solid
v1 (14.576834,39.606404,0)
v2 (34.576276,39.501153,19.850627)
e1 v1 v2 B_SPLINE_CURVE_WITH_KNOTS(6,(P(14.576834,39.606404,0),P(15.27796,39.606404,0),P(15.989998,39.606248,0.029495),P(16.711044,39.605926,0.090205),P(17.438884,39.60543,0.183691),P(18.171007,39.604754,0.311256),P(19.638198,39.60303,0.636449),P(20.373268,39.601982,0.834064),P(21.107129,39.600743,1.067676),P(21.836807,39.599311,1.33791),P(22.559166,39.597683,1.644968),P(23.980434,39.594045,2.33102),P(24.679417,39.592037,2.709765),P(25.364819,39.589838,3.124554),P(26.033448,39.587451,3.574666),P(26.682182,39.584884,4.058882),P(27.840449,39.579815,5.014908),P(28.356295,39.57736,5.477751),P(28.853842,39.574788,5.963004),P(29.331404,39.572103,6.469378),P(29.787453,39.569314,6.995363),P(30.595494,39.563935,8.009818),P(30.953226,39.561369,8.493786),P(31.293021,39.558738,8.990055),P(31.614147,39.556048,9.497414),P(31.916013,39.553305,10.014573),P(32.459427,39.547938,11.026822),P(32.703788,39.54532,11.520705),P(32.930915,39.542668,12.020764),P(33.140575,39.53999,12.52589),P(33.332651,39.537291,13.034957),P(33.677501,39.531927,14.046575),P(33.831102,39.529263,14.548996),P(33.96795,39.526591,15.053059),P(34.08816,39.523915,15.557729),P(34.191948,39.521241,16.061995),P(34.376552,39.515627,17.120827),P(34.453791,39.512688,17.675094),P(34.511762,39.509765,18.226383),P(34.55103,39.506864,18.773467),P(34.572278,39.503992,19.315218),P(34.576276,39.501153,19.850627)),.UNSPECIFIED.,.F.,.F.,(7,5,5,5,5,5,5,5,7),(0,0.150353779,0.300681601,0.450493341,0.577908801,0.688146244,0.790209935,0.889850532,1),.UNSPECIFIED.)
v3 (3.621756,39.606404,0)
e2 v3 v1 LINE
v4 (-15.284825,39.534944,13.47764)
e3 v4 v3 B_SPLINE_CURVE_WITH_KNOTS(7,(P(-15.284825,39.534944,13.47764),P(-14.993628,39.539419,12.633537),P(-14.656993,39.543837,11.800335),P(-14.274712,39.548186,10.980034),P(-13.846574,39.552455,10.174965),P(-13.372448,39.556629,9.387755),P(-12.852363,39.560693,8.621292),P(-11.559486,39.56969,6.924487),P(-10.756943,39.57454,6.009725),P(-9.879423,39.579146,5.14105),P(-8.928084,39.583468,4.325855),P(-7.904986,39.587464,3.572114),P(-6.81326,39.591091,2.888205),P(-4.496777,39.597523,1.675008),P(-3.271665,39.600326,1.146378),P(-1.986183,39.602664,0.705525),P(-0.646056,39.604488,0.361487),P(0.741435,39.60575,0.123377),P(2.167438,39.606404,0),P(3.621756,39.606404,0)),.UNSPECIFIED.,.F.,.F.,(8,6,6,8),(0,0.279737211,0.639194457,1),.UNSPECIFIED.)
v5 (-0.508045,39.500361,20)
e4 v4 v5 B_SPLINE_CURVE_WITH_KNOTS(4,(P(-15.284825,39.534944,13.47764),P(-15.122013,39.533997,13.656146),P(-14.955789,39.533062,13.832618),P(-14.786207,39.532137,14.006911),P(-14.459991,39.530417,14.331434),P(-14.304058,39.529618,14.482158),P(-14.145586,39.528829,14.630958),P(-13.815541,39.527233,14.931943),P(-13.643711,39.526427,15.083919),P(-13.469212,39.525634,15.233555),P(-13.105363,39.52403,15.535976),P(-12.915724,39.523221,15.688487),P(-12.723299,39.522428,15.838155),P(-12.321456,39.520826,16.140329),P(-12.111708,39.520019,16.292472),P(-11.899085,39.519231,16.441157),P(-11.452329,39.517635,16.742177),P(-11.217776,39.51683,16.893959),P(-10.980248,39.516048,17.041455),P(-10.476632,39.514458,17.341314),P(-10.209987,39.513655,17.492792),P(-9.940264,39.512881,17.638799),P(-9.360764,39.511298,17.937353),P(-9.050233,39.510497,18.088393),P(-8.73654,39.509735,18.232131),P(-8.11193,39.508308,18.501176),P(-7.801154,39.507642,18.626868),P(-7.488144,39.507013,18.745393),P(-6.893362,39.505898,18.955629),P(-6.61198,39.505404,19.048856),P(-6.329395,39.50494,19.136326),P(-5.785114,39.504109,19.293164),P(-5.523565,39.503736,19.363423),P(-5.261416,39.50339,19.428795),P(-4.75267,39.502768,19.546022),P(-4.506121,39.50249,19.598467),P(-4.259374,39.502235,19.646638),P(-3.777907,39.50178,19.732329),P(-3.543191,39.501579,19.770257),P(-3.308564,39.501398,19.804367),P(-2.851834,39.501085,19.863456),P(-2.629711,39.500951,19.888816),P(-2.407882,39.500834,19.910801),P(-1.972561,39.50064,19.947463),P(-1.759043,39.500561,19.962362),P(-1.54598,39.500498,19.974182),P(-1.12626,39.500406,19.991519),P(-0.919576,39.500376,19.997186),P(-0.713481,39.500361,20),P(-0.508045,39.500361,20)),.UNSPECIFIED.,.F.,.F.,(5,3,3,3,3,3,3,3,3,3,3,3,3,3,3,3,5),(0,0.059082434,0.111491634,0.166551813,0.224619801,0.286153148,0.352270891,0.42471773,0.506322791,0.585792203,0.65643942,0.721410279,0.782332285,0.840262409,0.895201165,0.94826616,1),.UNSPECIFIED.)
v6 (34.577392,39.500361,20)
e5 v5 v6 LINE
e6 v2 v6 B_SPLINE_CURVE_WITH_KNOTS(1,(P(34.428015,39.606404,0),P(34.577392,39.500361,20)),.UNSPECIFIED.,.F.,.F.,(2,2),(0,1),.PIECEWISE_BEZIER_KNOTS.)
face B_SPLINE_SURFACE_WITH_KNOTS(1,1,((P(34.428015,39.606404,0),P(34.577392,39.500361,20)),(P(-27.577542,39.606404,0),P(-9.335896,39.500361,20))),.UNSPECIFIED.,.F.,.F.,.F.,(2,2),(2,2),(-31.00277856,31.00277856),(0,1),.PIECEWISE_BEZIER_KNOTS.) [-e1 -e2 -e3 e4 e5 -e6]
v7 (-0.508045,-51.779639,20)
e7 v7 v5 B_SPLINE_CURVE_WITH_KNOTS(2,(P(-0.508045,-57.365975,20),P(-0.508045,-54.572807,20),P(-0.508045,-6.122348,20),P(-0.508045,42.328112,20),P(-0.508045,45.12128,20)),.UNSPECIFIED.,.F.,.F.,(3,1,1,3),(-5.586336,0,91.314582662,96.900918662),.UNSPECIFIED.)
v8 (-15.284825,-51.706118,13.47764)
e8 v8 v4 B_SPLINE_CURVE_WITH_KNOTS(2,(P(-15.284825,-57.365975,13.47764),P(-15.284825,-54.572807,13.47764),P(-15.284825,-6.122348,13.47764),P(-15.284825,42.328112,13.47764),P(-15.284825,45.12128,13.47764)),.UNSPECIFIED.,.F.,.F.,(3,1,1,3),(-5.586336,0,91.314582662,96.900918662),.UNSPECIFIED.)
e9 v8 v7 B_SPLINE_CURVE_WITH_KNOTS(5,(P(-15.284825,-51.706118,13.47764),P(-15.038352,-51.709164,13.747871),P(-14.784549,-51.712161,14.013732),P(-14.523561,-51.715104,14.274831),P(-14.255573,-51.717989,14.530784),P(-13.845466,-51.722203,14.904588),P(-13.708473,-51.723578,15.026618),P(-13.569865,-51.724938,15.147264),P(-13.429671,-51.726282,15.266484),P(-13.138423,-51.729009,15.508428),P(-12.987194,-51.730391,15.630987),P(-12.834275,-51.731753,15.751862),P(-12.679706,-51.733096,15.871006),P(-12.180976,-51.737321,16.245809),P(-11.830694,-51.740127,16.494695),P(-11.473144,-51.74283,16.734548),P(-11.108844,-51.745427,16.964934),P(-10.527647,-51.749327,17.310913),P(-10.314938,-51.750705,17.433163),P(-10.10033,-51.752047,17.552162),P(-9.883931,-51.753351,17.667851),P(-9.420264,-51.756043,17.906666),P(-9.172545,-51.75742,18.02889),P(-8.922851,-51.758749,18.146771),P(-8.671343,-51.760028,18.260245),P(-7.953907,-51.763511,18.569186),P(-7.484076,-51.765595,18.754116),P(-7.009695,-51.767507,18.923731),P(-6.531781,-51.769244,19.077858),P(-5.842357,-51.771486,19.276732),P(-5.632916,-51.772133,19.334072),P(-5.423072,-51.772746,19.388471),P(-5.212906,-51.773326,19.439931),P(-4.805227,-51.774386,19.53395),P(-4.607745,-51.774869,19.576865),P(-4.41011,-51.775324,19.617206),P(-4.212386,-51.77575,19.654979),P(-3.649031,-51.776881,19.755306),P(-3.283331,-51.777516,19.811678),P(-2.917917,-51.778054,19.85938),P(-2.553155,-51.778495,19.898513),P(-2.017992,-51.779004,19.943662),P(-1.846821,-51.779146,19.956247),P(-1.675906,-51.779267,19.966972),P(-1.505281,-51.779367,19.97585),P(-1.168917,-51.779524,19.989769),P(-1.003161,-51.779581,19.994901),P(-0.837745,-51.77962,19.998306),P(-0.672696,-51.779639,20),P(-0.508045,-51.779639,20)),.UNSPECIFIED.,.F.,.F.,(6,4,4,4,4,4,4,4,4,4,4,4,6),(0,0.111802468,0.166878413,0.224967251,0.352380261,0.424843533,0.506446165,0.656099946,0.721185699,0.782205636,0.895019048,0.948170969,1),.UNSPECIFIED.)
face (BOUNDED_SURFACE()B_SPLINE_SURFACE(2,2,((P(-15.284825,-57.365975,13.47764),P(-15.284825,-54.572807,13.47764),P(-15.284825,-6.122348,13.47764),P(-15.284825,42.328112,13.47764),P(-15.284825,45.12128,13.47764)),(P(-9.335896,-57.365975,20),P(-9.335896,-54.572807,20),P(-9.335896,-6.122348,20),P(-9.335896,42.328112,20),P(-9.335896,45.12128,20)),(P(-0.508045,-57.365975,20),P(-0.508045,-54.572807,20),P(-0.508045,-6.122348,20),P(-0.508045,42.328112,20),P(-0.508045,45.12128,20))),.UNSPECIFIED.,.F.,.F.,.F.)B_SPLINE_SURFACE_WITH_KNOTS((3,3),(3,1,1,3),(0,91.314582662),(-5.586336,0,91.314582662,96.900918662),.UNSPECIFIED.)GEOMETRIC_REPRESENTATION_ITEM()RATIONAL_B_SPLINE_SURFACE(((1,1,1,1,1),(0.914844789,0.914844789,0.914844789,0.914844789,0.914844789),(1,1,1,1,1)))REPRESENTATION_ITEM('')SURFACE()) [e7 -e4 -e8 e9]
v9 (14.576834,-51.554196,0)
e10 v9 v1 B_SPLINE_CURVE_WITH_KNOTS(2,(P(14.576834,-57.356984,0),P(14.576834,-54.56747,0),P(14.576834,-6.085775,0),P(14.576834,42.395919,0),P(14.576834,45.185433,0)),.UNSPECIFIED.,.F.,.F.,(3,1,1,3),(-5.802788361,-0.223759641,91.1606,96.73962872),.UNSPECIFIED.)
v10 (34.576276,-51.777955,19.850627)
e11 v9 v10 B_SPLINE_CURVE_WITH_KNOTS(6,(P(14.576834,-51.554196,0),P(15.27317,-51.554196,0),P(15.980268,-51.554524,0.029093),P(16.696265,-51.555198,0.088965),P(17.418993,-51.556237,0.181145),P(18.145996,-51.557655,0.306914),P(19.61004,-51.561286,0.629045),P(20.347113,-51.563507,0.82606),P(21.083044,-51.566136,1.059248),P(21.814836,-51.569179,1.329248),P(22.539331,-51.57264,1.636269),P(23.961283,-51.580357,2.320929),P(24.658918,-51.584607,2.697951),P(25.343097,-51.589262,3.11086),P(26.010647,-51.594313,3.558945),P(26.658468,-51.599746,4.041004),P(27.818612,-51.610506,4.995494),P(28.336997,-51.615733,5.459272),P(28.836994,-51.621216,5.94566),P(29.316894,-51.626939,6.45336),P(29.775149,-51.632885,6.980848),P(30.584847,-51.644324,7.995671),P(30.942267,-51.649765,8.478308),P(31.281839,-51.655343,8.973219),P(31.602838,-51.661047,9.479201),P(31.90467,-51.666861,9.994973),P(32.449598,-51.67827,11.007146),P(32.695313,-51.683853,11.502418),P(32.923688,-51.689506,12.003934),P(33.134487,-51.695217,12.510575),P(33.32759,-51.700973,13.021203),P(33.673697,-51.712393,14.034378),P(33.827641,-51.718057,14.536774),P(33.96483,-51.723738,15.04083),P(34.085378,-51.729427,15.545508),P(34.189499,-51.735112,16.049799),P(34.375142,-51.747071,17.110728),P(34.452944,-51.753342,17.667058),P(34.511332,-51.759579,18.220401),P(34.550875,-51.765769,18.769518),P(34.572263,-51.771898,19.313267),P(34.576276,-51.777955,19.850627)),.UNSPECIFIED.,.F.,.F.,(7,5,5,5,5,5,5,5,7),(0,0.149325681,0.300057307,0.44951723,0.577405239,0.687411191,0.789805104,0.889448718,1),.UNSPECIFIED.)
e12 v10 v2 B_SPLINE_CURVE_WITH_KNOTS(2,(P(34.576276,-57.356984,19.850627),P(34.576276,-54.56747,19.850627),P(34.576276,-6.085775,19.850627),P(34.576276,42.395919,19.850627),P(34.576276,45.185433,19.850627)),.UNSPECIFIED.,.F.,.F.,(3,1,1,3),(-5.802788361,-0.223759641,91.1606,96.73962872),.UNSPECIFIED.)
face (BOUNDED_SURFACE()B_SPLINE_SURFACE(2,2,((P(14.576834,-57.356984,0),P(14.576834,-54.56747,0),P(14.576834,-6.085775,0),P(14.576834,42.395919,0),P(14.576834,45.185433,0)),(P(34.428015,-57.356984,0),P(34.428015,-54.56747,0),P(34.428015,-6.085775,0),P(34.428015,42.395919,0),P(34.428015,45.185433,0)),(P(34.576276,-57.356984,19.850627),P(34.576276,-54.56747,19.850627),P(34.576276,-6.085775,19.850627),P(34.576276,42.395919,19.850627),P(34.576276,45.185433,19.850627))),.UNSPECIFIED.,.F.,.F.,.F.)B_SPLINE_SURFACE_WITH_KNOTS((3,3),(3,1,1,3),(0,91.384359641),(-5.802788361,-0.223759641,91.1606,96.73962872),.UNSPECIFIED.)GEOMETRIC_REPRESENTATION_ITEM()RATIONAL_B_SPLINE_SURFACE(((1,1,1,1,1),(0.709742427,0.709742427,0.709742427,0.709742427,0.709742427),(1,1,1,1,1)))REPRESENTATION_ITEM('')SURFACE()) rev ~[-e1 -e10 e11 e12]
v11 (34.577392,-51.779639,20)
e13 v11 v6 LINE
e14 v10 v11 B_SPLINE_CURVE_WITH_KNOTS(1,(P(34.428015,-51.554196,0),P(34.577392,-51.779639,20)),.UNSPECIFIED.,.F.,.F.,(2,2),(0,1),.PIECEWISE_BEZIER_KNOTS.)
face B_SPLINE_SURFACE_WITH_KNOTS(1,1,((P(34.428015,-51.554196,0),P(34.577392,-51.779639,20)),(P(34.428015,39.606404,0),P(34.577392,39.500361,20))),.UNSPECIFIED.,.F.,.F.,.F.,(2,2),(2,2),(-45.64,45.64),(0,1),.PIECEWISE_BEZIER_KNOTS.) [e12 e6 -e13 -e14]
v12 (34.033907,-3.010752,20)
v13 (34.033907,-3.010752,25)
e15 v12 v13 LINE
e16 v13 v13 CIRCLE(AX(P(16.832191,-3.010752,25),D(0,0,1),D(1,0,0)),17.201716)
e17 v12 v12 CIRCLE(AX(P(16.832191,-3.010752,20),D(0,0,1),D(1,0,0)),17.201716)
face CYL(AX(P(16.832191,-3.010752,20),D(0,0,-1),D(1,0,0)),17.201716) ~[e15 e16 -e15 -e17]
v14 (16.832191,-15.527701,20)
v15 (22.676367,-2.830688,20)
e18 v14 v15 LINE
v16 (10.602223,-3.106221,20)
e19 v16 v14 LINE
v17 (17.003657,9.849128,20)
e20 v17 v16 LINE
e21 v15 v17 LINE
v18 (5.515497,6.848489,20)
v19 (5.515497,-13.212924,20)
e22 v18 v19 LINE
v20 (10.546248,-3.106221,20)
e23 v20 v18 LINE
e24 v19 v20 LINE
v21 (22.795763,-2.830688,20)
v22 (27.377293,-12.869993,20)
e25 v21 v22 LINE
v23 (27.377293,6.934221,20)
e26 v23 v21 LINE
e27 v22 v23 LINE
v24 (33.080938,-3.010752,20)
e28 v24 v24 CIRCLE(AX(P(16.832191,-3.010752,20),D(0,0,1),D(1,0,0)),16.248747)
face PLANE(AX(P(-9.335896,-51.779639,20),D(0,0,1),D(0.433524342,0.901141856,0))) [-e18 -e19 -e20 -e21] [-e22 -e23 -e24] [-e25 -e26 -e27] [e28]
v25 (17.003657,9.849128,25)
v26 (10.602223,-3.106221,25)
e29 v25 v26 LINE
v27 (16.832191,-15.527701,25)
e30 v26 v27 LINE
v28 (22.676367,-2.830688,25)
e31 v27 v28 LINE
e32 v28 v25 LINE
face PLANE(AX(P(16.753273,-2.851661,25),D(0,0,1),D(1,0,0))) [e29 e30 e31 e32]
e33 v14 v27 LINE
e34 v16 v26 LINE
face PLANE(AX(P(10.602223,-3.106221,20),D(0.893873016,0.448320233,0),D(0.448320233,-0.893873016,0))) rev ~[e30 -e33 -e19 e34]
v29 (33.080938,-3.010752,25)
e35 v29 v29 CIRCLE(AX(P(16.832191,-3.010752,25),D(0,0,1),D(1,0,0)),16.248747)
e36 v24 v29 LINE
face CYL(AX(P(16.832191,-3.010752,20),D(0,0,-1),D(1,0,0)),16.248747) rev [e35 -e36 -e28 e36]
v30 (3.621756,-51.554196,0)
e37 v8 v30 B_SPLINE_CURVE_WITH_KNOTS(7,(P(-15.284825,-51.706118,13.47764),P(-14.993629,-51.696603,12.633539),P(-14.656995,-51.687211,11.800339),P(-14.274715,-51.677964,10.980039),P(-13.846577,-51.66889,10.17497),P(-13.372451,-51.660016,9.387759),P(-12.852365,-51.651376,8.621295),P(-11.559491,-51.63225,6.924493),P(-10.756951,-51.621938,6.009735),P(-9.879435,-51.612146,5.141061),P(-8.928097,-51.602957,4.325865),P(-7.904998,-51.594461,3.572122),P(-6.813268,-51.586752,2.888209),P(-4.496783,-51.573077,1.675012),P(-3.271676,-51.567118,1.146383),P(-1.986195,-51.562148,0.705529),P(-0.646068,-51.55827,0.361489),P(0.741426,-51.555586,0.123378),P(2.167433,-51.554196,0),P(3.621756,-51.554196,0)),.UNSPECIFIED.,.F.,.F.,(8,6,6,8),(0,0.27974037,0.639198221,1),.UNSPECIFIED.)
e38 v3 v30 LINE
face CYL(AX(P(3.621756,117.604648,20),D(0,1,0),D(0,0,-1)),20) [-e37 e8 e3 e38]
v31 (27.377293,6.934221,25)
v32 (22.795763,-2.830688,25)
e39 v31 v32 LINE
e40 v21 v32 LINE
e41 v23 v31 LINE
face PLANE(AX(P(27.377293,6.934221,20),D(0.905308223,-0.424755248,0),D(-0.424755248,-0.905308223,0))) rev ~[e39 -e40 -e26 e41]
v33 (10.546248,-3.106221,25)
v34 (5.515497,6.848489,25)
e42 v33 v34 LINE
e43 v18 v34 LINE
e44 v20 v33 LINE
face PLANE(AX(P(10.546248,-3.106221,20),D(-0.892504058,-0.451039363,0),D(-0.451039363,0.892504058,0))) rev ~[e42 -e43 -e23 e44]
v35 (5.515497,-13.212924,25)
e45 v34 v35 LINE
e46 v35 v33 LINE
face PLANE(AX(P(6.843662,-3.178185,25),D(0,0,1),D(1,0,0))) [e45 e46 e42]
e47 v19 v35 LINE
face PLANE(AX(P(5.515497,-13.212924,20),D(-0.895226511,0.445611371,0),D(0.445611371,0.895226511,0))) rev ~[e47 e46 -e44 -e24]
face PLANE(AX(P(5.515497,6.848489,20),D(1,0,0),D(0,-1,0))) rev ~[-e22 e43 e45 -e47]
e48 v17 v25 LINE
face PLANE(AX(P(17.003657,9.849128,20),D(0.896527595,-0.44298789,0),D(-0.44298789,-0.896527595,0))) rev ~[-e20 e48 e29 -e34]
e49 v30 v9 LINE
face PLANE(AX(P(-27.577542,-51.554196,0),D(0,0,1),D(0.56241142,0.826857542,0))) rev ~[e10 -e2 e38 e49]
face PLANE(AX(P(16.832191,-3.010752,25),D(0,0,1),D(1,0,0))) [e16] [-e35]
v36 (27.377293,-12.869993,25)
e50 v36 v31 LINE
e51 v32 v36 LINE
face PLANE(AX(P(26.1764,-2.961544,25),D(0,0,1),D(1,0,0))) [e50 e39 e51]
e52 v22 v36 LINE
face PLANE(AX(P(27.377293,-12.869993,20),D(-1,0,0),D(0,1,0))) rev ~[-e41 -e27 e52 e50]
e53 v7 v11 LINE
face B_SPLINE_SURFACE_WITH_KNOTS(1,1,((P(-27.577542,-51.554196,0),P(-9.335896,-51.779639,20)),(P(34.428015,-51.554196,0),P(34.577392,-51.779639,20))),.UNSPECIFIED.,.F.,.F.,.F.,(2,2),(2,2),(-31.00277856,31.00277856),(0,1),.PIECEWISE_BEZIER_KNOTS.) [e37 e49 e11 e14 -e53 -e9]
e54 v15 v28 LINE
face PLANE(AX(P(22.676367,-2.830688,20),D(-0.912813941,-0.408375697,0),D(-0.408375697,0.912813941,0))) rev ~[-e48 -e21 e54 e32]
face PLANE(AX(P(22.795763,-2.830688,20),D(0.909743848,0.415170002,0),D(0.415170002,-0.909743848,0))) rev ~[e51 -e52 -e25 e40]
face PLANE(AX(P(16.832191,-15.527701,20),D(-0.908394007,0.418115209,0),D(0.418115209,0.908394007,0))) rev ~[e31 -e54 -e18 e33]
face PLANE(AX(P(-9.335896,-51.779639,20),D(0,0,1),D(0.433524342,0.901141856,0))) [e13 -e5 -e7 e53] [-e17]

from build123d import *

# Parameters (mm, degrees)
F0_W        = 62.0055571198
F0_H        = 91.1606
F2_W        = 43.9132880419
F2_H        = 91.28
F4_R        = 20
F5_R        = 20
F6_T1_DEPTH = 247.1570875446
F8_R        = 17.2017157063
F8_R_2      = 16.2487468326
F9_DEPTH    = 5
F10_DEPTH   = 5


# Not quite as in the source:
# - a fillet or chamfer that OpenCascade refuses, or shapes differently, is made with other operations: its cross-section is extruded or revolved along the edge and cut away or added


with BuildPart() as f3:
    # F0 (on Top) → F3 section 0
    with BuildSketch(Plane.XY):
        with Locations((3.4252367914, -5.9738955829)):
            Rectangle(F0_W, F0_H)
    # F2 (on offset) → F3 section 1
    with BuildSketch(Plane.XY.offset(20)):
        with Locations((12.6207480207, -6.1396389759)):
            Rectangle(F2_W, F2_H)
    loft()

    # F4
    f4_edges = [f3.edges().sort_by_distance(p)[0] for p in [
        (-9.335896, -6.139639, 20),
    ]]
    fillet(f4_edges, radius=F4_R)

    # F5
    f5_edges = [f3.edges().sort_by_distance(p)[0] for p in [
        (34.428015, -5.973896, 0),
    ]]
    fillet(f5_edges, radius=F5_R)

    # F6: fillet of radius 20 on 1 edges, made by hand

    # F6_s2 → F6_t1 (cut)
    with BuildSketch(Plane.XZ.offset(-117.6046481894)):
        with BuildLine():
            ThreePointArc((3.6217557404, 0), (-7.9875678865, 3.7143128813), (-15.2848254843, 13.4776395073))
            Line((-15.2848254843, 13.4776395073), (-27.5775417686, 0))
            Line((-27.5775417686, 0), (3.6217557404, 0))
        make_face()
    extrude(amount=F6_T1_DEPTH, mode=Mode.SUBTRACT)

    # F8 (on offset) → F9 (join)
    with BuildSketch(Plane.XY.offset(20)):
        with Locations((16.8321914971, -3.0107519124)):
            Circle(F8_R)
        with Locations((16.8321914971, -3.0107519124)):
            Circle(F8_R_2, mode=Mode.SUBTRACT)
        Polygon((5.5154971778, 6.8484889343), (5.5154971778, -13.2129238918), (10.5462484062, -3.106220687), align=None)
        Polygon((27.3772925138, -12.8699932247), (27.3772925138, 6.9342213683), (22.7957628667, -2.8306879103), align=None)
    extrude(amount=F9_DEPTH)

    # F8 (on offset) → F10 (join)
    with BuildSketch(Plane.XY.offset(20)):
        Polygon((17.0036572963, 9.8491283134), (10.6022227556, -3.106220687), (16.8321914971, -15.5277010053), (22.6763673127, -2.8306879103), align=None)
    extrude(amount=F10_DEPTH)


solid = f3.part
